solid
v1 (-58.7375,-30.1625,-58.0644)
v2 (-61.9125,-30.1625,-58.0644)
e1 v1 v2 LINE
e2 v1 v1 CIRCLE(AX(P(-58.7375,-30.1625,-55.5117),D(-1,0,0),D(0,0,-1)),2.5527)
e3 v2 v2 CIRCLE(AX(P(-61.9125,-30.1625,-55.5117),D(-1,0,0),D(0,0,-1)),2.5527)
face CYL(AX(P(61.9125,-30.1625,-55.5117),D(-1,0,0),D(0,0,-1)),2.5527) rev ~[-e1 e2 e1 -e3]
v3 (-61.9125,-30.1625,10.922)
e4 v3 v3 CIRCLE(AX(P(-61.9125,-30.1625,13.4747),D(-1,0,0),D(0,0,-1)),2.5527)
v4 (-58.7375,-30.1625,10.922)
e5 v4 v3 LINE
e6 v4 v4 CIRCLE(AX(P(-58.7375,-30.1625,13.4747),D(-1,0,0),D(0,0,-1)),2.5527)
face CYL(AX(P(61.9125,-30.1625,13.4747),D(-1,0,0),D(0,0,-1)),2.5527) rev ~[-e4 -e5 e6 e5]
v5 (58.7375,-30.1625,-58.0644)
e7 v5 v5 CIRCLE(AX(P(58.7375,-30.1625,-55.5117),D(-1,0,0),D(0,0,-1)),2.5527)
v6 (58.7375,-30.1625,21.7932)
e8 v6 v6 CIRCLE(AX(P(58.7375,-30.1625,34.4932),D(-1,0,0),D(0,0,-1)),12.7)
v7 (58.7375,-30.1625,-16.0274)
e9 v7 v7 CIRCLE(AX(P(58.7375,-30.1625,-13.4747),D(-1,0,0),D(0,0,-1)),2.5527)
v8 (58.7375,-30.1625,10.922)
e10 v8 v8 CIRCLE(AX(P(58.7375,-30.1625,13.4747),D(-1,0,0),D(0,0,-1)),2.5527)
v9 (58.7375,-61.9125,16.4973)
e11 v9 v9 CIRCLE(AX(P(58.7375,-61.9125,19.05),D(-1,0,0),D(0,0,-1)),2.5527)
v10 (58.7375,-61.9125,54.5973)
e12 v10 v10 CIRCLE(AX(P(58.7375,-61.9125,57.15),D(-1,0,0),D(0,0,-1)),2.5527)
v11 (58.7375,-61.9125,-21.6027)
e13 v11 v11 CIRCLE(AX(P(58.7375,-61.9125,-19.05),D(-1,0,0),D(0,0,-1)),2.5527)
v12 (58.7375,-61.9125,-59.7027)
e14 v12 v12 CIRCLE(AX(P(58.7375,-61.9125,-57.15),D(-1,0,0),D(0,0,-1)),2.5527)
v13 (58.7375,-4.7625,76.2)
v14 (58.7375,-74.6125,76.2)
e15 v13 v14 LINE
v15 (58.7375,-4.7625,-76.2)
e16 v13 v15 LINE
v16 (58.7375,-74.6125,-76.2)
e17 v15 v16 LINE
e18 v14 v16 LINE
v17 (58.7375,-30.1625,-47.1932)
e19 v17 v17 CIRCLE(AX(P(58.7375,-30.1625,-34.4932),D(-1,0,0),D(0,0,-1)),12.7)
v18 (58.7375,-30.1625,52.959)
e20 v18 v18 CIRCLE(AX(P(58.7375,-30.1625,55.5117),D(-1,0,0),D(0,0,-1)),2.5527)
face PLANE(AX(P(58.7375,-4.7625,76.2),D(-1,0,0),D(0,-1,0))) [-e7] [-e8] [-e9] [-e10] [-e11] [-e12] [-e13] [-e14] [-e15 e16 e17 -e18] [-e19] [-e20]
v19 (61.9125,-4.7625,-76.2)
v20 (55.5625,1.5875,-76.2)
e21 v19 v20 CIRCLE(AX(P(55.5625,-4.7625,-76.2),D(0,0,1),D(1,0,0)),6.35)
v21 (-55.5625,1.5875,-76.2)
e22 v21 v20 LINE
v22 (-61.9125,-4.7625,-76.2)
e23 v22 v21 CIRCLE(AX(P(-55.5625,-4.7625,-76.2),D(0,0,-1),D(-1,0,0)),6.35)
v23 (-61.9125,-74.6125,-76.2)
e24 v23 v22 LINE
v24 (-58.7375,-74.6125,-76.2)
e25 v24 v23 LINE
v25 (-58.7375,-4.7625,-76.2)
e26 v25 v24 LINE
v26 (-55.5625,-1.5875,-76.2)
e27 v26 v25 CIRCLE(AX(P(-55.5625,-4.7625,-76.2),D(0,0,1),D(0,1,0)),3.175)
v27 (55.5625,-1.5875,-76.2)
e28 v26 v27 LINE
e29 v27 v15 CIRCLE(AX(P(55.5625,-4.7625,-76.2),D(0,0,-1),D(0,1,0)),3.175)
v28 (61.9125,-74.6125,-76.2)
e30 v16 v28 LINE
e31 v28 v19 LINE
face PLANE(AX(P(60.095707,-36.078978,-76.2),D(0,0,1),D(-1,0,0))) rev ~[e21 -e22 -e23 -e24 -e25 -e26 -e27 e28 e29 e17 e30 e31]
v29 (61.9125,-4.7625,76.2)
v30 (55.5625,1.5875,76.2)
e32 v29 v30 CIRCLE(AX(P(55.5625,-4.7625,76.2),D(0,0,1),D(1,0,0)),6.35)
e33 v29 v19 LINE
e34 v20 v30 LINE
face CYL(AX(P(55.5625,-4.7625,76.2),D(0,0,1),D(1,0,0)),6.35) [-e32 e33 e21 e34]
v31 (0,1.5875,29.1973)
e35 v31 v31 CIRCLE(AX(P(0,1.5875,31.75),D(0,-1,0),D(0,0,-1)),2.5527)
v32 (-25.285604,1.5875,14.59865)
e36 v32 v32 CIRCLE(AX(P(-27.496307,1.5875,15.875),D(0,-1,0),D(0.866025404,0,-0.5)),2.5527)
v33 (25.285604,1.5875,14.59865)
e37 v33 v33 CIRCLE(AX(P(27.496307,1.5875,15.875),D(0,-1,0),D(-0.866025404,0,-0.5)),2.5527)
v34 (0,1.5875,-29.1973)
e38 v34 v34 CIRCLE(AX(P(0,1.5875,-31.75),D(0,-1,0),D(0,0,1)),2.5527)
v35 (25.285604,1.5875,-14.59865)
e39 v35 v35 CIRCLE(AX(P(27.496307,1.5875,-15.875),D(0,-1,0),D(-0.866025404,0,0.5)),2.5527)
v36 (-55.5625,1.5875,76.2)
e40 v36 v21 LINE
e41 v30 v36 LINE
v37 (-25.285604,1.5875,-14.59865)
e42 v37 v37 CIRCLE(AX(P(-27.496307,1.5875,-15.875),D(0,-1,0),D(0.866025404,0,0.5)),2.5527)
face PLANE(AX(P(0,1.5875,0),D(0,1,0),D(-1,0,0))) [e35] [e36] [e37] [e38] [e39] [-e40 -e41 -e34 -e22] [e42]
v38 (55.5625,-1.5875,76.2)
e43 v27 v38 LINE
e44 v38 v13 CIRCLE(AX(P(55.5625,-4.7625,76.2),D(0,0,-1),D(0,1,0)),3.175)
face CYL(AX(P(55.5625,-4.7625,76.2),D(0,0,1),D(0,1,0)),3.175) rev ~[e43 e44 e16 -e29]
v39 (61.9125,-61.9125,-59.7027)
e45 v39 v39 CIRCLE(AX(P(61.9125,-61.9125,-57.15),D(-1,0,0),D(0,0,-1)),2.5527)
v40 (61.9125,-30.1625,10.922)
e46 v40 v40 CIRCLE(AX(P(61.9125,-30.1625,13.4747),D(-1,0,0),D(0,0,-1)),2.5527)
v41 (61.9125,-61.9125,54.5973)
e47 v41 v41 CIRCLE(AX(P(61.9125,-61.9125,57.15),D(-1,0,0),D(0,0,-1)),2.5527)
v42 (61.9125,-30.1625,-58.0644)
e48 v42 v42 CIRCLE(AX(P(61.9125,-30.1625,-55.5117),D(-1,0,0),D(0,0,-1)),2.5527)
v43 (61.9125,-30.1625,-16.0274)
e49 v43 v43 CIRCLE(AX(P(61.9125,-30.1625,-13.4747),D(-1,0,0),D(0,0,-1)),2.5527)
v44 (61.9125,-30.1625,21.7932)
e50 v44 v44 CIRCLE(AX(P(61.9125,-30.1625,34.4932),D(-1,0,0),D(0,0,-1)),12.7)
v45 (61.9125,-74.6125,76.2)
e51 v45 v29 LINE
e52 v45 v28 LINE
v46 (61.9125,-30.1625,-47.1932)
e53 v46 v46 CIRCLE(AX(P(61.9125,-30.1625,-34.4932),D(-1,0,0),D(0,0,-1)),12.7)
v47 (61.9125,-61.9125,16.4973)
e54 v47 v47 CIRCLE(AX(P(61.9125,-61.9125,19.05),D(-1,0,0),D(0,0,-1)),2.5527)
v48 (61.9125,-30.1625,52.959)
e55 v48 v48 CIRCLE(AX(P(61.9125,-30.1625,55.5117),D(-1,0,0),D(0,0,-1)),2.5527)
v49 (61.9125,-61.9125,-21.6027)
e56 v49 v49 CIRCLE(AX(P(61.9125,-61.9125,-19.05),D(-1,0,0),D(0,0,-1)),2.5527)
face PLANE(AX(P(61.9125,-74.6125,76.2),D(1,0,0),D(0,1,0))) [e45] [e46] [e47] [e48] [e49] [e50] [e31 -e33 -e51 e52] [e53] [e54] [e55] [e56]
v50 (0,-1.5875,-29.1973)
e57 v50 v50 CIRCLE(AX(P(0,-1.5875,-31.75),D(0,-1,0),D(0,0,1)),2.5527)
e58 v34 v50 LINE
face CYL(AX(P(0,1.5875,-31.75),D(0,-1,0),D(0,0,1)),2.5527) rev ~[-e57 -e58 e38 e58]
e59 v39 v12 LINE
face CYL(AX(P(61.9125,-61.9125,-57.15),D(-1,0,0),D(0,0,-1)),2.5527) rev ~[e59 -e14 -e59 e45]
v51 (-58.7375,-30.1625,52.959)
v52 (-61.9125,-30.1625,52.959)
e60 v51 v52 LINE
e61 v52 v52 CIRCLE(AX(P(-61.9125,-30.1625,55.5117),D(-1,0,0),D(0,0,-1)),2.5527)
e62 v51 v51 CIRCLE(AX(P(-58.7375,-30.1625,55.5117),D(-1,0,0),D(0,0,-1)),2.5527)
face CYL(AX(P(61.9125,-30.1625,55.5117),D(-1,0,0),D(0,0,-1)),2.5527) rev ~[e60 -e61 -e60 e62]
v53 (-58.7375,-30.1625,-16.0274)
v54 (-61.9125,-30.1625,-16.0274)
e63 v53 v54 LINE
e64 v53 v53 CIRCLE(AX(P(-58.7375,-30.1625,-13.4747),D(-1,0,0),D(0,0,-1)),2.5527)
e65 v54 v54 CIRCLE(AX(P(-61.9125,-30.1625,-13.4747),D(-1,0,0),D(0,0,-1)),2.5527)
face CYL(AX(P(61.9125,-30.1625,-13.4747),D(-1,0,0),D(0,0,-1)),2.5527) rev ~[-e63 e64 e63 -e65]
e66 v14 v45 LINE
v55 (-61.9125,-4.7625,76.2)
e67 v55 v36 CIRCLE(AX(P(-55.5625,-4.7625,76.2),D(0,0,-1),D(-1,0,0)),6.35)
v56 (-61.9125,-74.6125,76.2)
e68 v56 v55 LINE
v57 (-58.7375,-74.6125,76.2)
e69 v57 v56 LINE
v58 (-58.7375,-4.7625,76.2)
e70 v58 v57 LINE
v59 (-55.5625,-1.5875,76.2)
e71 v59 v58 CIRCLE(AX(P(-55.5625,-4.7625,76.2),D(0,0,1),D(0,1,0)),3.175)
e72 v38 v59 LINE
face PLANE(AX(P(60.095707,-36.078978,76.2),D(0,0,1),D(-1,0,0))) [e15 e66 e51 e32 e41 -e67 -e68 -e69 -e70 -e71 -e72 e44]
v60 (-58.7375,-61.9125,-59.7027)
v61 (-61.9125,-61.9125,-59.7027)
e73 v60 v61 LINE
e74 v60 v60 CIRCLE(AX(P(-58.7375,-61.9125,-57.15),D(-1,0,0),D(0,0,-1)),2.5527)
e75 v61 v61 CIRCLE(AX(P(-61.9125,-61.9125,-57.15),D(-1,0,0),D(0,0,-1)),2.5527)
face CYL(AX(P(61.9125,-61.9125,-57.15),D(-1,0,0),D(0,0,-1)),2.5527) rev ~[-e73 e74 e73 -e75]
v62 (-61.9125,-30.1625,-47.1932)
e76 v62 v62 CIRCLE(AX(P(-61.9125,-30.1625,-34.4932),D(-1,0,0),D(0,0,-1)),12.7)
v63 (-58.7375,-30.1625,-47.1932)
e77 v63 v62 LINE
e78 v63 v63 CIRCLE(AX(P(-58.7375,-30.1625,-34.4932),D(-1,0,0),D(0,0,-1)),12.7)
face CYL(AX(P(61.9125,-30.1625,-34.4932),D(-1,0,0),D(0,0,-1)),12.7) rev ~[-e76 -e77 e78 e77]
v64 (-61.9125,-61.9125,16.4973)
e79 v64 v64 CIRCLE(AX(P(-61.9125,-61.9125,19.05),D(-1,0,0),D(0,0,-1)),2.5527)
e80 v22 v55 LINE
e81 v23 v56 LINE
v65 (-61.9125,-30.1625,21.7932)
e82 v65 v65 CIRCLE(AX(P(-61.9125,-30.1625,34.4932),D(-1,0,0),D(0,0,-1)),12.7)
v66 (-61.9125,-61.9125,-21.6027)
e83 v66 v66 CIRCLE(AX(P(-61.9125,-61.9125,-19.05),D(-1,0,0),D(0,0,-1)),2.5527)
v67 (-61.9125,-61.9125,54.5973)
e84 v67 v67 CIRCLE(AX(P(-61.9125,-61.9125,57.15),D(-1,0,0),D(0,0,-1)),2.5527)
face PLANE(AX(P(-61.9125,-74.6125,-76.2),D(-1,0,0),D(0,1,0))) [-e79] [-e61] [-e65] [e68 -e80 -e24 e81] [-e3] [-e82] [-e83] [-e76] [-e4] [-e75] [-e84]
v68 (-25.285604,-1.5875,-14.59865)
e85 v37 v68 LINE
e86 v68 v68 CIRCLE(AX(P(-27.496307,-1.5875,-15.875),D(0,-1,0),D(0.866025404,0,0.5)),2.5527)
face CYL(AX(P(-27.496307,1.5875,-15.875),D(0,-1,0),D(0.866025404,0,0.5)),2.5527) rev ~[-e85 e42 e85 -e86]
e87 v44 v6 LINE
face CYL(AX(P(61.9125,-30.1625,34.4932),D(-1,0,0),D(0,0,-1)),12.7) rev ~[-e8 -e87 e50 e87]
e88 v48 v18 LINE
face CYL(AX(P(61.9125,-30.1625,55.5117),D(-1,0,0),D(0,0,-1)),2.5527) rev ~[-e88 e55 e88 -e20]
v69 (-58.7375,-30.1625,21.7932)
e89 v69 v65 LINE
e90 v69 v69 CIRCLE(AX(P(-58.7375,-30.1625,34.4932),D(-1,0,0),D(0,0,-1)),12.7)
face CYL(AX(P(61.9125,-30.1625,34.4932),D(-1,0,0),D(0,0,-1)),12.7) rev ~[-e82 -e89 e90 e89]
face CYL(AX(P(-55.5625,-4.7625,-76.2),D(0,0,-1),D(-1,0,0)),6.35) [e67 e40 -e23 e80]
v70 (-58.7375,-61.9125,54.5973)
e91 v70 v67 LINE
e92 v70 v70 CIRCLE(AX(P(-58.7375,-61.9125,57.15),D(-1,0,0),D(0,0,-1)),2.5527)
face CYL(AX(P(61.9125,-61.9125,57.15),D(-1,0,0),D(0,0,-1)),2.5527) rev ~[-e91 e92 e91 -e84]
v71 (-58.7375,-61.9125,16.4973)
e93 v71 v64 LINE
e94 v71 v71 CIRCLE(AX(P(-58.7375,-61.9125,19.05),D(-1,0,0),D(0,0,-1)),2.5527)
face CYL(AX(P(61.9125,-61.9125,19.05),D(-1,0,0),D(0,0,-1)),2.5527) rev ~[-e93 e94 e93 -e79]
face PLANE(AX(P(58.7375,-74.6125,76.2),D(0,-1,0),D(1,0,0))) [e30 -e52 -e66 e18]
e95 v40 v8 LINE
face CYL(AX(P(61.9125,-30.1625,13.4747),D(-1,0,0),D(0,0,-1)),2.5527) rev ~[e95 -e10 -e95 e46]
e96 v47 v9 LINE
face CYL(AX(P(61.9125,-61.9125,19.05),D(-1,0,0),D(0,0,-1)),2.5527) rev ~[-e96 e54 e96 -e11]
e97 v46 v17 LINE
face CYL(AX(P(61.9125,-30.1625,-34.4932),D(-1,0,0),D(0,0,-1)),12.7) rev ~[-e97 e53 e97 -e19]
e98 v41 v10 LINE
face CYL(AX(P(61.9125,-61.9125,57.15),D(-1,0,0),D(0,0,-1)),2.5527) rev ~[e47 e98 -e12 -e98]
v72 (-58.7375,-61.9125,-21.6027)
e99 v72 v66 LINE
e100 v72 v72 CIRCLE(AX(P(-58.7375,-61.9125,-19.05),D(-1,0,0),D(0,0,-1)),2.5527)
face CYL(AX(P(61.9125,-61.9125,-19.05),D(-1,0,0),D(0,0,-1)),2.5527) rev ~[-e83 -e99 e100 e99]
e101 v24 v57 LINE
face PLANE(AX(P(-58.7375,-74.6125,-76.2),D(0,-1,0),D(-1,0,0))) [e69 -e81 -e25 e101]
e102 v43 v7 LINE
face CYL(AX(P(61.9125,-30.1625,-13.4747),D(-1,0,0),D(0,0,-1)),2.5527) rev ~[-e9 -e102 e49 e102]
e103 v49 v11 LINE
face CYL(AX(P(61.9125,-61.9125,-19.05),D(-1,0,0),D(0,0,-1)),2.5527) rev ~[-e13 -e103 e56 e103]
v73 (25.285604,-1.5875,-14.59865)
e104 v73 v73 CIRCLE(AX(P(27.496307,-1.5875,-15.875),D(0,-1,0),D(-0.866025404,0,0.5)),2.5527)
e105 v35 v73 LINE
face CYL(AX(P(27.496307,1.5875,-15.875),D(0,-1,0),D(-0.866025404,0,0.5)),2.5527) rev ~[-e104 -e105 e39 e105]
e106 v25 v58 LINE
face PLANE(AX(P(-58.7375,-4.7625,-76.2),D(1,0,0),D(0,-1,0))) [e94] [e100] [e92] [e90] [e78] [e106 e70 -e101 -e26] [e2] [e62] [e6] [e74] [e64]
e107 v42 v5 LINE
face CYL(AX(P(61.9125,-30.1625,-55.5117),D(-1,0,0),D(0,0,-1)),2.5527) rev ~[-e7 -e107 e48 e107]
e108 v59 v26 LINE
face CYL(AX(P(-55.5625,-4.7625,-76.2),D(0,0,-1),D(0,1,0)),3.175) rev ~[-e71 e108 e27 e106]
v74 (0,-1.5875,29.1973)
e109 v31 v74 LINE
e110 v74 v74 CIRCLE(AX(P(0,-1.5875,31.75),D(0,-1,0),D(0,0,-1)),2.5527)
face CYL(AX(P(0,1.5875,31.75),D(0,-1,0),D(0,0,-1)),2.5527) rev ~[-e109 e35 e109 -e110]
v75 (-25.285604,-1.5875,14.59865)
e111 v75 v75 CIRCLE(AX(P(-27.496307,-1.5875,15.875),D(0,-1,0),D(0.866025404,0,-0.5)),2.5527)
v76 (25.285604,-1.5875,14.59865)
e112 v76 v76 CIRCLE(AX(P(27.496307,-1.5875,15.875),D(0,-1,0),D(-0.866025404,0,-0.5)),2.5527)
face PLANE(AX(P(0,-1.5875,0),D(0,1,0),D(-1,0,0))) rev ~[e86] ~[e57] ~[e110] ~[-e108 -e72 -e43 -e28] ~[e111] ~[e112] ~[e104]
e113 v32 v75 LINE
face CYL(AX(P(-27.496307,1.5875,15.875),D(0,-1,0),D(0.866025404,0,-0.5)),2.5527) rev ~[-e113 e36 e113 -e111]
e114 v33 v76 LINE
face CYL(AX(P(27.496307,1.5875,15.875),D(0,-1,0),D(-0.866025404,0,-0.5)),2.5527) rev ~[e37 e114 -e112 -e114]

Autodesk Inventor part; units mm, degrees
ref_plane "YZ Plane" through (0, 0, 0) normal (1, 0, 0) x (0, 1, 0)
ref_plane "XZ Plane" through (0, 0, 0) normal (0, 1, 0) x (-1, 0, 0)
ref_plane "XY Plane" through (0, 0, 0) normal (0, 0, 1) x (1, 0, 0)
sketch "Sketch1" plane through (0, 0, 0) normal (0, 1, 0) x (-1, 0, 0)
  line L0 (61.9125, -76.2) -> (-61.9125, -76.2)
  line L1 (-61.9125, -76.2) -> (-61.9125, 76.2)
  line L2 (-61.9125, 76.2) -> (61.9125, 76.2)
  line L3 (61.9125, 76.2) -> (61.9125, -76.2)
  line L4 (61.9125, -76.2) -> (-61.9125, 76.2) construction
  line L5 (-61.9125, -76.2) -> (61.9125, 76.2) construction
  point P0 (0, 0)
  dimension "d0" = 152.4
  dimension "d1" = 123.825
extrude "Plate1" add sketch "Sketch1" along normal mid plane 3.175
sketch "Sketch3" plane through (58.7375, 1.5875, 76.2) normal (1, 0, 0) x (0, 1, 0)
  line L0 (0, -152.4) -> (0, 0)
  line L1 (0, 0) -> (-76.2, 0)
  line L2 (-76.2, 0) -> (-76.2, -152.4)
  line L3 (-76.2, -152.4) -> (0, -152.4)
edge flange "Flange1" height 76.2 angle 90 thickness 3.175 bend radius 3.175 thickness toward (1, 0, 0) relief tear relief width 3.175 relief depth 1.5875 corner gap 3.175 corner form 0 edges at (61.9125, -1.5875, 0) (-61.9125, -1.5875, 0) wall of the first edge with corners at (58.7375, 1.5875, -76.2) (58.7375, 1.5875, 76.2) (58.7375, -74.6125, 76.2) (58.7375, -74.6125, -76.2)
bend "Bend1"
corner "Corner1"
sketch "Sketch4" plane through (61.9125, -74.6125, 76.2) normal (1, 0, 0) x (0, 0, -1)
  line L0 (0, 76.2) -> (152.4, 76.2) construction
  line L1 (0, 0) -> (0, 69.85) construction
  line L2 (41.7068, 44.45) -> (110.6932, 44.45) construction
  point P0 (76.2, 74.6125)
  point P1 (76.2, 44.45)
  point P2 (76.2, 76.2)
  dimension "d14" = 31.75
  dimension "d15" = 68.9864
hole "Hole1" at (61.9125, -30.1625, 34.4932) at (61.9125, -30.1625, -34.4932) direction (-1, 0, 0) diameter 25.4 end through all
sketch "Sketch5" plane through (0, 1.5875, 0) normal (0, 1, 0) x (1, 0, 0)
  circle A0 centre (0, 0) radius 31.75 construction
  point P0 (0, 31.75)
  dimension "d24" = 63.5
hole "Hole2" at (0, 1.5875, -31.75) direction (0, -1, 0) diameter 5.1054 end through all clearance for "Flat Head Machine Screw (82)" size "#10" standard "Ansi Unified Screw Threads"
pattern_circular "Circular Pattern1" count 6 over 360 about axis through (0, -10, 0) along (0, 1, 0) of "Hole2"
sketch "Sketch6" plane through (61.9125, -74.6125, 76.2) normal (1, 0, 0) x (0, 0, -1)
  line L0 (19.05, 12.7) -> (57.15, 12.7) construction
  line L1 (57.15, 12.7) -> (95.25, 12.7) construction
  line L2 (95.25, 12.7) -> (133.35, 12.7) construction
  line L3 (152.4, 0) -> (0, 0) projected
  point P0 (76.2, 74.6125)
  point P1 (76.2, 12.7)
  point P2 (76.2, 0)
  dimension "d35" = 38.1
  dimension "d36" = 38.1
  dimension "d37" = 38.1
  dimension "d38" = 12.7
hole "Hole3" at (61.9125, -61.9125, 57.15) at (61.9125, -61.9125, 19.05) at (61.9125, -61.9125, -19.05) at (61.9125, -61.9125, -57.15) direction (-1, 0, 0) diameter 5.1054 end through all clearance for "Flat Head Machine Screw (82)" size "#10" standard "Ansi Unified Screw Threads"
sketch "Sketch7" plane through (61.9125, -74.6125, 76.2) normal (1, 0, 0) x (0, 0, -1)
  circle A0 centre (95.25, 12.7) radius 2.5527 projected
  circle A1 centre (19.05, 12.7) radius 2.5527 projected
  circle A2 centre (57.15, 12.7) radius 2.5527 projected
  circle A3 centre (133.35, 12.7) radius 2.5527 projected
  circle A4 centre (41.7068, 44.45) radius 12.7 projected
  circle A5 centre (110.6932, 44.45) radius 12.7 projected
  line L0 (0, 69.85) -> (152.4, 69.85) projected
  line L1 (152.4, 69.85) -> (152.4, 0) projected
  line L2 (152.4, 0) -> (0, 0) projected
  line L3 (0, 0) -> (0, 69.85) projected
  line L4 (20.6883, 44.45) -> (62.7253, 44.45) construction
  line L5 (89.6747, 44.45) -> (131.7117, 44.45) construction
  point P0 (76.2, 74.6125)
  dimension "d46" = 42.037
  dimension "d47" = 42.037
hole "Hole4" at (61.9125, -30.1625, 55.5117) at (61.9125, -30.1625, 13.4747) at (61.9125, -30.1625, -13.4747) at (61.9125, -30.1625, -55.5117) direction (-1, 0, 0) diameter 5.1054 end through all clearance for "Flat Head Machine Screw (82)" size "#10" standard "Ansi Unified Screw Threads"
equation "\"d22\" = Thickness"
equation "\"d30\" = Thickness"
equation "\"d36\" = d35"
equation "\"d37\" = d35"
equation "\"d44\" = Thickness"
equation "\"d47\" = d46"
equation "\"d53\" = Thickness"
equation "\"d2\" = Thickness"
equation "\"d4\" = BendReliefWidth"
equation "\"d5\" = BendReliefDepth"
equation "\"d6\" = MinimumRemnant"
equation "\"d7\" = TransitionRadius"
equation "\"d10\" = BendRadius"
equation "\"d11\" = CornerReliefSize"
equation "\"d12\" = GapSize"
equation "\"d13\" = JacobiRadiusSize"
equation "\"BendRadius\" = Thickness"
equation "\"BendReliefWidth\" = Thickness"
equation "\"BendReliefDepth\" = 0.5 * Thickness"
equation "\"CornerReliefSize\" = 4 * Thickness"
equation "\"MinimumRemnant\" = 2 * Thickness"
equation "\"TransitionRadius\" = BendRadius"
equation "\"JacobiRadiusSize\" = BendRadius"
equation "\"GapSize\" = Thickness"
equation "\"Thickness\" = 3.175"
properties part number "GP3-001" material "Aluminum 6061"
